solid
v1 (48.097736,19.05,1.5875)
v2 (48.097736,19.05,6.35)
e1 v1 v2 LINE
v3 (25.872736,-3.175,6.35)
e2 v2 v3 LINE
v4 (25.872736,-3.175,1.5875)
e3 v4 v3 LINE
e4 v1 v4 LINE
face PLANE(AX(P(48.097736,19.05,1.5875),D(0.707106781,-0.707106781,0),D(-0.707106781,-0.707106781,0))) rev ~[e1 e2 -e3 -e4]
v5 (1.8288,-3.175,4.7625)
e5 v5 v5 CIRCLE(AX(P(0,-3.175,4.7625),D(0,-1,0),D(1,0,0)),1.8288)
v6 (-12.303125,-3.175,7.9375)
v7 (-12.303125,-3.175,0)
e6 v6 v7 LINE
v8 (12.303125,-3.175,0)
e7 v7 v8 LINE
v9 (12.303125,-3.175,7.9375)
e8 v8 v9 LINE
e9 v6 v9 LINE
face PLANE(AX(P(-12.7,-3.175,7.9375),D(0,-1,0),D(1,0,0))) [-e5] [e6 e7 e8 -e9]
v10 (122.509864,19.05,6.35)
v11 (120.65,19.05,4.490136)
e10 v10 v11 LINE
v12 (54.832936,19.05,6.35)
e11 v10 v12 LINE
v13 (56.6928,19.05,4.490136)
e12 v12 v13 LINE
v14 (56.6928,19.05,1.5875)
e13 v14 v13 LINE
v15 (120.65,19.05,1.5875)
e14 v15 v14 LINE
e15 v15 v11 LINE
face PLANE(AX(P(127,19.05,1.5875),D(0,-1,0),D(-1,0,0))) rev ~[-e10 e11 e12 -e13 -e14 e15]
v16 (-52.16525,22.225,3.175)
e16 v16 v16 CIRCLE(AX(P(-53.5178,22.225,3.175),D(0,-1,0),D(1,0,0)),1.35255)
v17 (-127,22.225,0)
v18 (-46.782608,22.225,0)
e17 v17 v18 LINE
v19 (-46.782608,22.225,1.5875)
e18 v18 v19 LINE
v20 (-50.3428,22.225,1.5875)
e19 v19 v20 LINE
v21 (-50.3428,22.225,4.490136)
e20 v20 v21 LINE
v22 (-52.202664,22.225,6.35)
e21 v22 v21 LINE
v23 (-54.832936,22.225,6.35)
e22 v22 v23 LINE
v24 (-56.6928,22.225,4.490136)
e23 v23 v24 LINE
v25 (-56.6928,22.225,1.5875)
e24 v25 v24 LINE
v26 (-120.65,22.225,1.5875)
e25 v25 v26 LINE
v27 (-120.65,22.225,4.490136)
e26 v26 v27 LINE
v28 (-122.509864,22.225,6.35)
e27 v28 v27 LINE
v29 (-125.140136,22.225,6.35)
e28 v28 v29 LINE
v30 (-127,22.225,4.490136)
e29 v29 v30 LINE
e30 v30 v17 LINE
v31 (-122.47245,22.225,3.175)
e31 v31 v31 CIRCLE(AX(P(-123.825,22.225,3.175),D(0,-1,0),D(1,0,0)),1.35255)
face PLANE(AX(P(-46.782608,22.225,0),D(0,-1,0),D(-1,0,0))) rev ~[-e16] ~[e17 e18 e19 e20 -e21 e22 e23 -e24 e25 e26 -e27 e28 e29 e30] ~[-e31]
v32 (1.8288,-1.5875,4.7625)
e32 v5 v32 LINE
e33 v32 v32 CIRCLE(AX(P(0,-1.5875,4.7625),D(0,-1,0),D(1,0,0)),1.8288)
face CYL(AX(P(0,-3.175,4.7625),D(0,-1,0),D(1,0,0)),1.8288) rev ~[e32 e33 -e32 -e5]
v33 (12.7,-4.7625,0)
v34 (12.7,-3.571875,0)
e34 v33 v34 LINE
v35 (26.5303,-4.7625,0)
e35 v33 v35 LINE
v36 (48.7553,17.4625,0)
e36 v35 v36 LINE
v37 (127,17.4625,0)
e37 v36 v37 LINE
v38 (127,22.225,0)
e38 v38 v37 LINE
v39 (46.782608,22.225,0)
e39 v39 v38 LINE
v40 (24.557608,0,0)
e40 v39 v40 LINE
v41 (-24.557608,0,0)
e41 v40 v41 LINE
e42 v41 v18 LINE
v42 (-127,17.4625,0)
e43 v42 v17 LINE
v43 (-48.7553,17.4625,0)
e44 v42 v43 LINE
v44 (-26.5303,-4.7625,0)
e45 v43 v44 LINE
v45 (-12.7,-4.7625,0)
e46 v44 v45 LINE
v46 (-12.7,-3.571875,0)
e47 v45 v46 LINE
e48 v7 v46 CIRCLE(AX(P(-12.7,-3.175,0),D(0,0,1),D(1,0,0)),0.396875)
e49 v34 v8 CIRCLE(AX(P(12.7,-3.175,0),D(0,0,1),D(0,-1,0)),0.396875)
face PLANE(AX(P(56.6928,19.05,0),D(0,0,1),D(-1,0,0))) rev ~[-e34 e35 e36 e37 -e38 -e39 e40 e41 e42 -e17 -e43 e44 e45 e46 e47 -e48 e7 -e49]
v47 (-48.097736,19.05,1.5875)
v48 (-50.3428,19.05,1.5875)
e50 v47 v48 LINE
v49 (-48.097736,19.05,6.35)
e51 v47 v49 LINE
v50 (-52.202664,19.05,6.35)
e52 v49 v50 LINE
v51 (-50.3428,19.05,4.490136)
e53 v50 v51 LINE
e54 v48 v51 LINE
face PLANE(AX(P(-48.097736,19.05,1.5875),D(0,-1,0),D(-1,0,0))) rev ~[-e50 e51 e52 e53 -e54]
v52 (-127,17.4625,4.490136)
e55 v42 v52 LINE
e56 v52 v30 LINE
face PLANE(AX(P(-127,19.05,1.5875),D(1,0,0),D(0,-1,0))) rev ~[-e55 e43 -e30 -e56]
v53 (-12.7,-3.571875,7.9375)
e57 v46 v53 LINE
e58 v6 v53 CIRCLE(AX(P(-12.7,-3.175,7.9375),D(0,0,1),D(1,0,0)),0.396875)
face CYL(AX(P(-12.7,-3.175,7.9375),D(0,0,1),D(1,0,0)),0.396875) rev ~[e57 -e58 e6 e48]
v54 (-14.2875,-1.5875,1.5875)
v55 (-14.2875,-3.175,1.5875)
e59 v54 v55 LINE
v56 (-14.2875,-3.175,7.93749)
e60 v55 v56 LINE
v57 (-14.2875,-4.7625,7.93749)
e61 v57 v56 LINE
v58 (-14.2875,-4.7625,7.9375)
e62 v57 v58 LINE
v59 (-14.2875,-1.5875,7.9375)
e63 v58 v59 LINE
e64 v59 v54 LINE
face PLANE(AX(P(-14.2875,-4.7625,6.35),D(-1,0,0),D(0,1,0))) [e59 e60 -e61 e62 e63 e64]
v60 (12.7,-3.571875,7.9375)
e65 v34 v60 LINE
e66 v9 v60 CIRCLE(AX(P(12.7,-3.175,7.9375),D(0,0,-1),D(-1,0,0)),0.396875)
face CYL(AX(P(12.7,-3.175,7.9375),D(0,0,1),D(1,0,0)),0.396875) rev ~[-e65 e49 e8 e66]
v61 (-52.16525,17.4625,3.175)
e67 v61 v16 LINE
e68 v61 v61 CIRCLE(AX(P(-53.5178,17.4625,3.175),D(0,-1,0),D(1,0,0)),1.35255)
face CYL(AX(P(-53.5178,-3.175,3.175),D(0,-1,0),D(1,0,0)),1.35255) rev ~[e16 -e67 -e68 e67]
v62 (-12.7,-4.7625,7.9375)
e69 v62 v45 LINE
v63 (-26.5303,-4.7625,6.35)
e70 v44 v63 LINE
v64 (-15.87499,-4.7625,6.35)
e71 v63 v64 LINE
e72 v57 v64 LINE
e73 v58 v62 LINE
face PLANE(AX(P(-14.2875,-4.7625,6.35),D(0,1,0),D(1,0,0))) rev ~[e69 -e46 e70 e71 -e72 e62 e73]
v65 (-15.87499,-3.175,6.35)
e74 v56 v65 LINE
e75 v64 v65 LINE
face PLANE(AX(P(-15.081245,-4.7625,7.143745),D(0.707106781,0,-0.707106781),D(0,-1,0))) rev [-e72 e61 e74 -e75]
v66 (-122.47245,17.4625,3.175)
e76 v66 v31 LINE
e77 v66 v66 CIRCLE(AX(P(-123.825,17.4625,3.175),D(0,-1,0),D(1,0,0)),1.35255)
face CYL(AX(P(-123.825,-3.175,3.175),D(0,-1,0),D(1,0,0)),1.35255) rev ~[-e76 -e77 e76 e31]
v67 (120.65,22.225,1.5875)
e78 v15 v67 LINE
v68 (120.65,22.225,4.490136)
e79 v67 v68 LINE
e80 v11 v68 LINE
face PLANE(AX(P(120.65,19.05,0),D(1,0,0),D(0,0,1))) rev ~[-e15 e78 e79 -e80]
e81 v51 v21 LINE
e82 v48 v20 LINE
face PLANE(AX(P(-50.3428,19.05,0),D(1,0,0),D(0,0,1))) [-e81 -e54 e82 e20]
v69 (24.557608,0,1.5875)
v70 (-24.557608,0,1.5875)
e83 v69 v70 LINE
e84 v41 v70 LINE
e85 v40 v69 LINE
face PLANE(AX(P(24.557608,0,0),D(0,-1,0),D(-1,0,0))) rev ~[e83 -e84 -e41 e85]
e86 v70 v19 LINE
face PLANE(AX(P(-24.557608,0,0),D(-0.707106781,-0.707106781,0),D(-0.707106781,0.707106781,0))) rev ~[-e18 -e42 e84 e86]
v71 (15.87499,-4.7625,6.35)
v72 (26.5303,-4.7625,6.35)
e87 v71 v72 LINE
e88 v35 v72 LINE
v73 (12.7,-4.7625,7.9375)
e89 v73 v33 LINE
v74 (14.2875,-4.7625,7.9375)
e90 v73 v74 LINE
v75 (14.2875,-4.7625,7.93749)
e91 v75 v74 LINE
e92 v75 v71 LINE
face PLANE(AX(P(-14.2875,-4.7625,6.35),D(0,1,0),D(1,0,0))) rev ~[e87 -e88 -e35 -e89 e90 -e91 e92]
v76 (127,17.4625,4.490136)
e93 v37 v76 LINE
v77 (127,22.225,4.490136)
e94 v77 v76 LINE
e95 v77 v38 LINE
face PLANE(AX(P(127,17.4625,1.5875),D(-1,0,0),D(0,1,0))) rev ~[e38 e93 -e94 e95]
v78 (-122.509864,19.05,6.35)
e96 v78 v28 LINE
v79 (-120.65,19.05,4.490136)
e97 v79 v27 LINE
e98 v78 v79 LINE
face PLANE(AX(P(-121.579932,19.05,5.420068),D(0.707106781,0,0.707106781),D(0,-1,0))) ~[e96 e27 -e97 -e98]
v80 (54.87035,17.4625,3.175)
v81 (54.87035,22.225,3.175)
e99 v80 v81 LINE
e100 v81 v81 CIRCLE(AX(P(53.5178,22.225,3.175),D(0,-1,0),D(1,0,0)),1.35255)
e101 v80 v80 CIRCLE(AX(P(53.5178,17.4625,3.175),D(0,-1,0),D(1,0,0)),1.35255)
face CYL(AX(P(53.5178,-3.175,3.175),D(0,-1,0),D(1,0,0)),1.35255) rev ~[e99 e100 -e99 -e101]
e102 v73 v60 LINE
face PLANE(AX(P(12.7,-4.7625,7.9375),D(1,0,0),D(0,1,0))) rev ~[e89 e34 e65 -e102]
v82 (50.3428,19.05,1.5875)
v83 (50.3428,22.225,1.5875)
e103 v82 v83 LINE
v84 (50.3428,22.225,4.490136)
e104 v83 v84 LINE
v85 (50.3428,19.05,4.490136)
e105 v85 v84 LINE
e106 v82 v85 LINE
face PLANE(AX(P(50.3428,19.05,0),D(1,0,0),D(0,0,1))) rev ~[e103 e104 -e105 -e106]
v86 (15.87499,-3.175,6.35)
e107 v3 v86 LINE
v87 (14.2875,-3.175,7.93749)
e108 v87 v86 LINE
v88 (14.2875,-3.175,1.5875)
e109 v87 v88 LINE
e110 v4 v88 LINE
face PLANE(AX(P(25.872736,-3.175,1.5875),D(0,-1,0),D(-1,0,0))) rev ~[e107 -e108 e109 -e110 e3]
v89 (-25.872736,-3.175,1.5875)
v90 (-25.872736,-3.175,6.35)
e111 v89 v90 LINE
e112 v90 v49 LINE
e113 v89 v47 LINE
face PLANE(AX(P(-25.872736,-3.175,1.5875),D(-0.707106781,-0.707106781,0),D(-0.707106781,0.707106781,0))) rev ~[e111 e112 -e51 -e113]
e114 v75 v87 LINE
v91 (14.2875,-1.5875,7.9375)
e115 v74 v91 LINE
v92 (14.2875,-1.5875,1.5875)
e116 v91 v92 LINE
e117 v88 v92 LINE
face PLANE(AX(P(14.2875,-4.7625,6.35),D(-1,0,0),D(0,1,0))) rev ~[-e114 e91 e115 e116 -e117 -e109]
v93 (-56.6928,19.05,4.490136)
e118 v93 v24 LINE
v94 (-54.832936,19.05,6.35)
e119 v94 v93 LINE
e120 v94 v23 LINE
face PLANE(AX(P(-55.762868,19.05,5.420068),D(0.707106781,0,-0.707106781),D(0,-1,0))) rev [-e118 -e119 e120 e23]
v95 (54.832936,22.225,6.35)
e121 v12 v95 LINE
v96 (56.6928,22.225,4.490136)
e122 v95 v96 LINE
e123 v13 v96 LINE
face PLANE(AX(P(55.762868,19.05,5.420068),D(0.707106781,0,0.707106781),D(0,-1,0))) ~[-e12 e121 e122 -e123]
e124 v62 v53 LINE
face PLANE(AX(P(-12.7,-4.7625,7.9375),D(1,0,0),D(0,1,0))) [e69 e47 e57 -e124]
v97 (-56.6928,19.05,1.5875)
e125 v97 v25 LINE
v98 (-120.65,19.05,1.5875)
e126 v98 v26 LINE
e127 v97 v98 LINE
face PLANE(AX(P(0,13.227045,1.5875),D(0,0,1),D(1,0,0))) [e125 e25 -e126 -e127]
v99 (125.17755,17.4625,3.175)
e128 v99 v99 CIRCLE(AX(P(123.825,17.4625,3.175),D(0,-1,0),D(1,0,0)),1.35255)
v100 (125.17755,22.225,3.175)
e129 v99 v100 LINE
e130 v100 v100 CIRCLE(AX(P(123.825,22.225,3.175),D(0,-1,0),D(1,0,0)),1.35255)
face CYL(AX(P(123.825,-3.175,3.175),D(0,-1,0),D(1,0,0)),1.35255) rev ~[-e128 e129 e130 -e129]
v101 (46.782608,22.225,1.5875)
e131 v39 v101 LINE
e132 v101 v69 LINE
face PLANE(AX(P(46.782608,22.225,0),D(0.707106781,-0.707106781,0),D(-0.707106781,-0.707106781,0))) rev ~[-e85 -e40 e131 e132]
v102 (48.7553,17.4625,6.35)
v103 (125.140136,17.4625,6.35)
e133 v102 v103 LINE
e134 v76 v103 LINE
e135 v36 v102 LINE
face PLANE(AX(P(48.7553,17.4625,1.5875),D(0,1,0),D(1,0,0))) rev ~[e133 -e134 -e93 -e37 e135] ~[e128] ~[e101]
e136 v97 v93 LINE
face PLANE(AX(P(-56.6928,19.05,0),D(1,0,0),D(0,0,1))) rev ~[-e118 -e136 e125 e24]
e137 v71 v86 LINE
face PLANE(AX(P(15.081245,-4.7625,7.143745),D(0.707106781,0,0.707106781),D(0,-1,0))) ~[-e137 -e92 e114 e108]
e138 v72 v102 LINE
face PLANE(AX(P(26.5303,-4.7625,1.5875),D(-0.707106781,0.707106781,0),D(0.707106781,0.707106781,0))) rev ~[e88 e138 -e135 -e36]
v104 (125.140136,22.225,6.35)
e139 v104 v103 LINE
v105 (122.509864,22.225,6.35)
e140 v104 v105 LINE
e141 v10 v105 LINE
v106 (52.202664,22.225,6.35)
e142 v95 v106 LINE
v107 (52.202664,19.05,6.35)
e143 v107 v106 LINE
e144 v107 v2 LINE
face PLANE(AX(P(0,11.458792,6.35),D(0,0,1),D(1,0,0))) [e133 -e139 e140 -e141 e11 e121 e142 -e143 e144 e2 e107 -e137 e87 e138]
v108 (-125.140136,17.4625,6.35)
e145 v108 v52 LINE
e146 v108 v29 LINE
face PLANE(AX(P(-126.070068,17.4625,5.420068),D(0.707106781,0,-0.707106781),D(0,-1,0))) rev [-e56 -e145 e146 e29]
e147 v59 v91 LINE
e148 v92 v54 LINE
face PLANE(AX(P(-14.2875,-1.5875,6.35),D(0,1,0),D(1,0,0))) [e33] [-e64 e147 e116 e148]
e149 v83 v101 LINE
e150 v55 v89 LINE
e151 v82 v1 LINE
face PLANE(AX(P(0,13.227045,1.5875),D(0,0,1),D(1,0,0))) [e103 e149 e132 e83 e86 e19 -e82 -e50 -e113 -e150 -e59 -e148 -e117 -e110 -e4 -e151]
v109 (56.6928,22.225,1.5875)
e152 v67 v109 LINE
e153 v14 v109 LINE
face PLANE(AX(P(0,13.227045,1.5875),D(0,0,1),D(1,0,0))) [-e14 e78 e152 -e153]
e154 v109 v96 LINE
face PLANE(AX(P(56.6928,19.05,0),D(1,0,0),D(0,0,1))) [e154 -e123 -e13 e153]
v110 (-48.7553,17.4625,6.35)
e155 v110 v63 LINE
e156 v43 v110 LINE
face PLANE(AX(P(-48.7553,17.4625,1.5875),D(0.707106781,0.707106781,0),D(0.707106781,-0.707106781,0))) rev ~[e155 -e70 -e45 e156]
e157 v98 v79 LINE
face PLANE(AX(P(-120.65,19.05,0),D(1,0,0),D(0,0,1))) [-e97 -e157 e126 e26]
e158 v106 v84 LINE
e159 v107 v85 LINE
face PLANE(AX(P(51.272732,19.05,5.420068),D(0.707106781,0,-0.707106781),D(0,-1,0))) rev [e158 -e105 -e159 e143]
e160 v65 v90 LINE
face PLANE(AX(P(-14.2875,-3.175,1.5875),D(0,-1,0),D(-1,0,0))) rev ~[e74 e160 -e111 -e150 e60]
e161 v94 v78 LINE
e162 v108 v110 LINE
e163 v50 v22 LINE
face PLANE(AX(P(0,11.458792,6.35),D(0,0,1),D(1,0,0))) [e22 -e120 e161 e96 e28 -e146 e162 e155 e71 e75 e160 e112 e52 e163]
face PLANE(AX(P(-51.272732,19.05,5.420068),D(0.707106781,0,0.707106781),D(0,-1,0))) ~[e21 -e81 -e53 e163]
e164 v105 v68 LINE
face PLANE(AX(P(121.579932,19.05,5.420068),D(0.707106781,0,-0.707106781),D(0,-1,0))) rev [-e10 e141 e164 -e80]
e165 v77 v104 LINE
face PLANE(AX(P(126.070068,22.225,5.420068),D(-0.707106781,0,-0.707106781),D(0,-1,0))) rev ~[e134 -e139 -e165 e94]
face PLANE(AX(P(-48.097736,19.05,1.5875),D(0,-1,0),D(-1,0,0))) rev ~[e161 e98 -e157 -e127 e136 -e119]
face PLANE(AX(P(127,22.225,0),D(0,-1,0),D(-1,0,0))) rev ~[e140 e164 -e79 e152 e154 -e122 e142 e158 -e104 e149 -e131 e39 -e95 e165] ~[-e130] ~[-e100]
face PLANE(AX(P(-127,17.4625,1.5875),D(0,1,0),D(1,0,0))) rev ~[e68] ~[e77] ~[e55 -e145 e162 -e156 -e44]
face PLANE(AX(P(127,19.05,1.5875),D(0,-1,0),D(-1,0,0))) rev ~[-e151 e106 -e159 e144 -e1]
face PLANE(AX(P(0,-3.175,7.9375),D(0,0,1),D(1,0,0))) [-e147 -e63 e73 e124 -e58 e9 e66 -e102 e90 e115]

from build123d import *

# Parameters (mm, degrees)
F1_DEPTH  = 1.5875
F3_DEPTH  = 4.7625
F4_W      = 6.35
F4_H      = 6.35
F5_DEPTH  = 3.175
F6_SIZE   = 1.8598642
F7_W      = 28.575
F7_H      = 3.175
F8_DEPTH  = 1.5875
F9_W      = 25.4
F9_H      = 1.5875
F10_DEPTH = 7.9375
F11_R     = 1.35255
F11_R_2   = 1.8288
F12_DEPTH = 25.4
F13_SIZE  = 1.58749
F14_R     = 0.396875
F15_DEPTH = 7.9375


# Not quite as in the source:
# - a fillet or chamfer is up to 0.001 mm smaller than in the source, because OpenCascade refuses the exact size


with BuildPart() as f1:
    # F0 (on Top) → F1 (new body)
    with BuildSketch(Plane.XY):
        Polygon((-46.7826079092, 22.225), (-127, 22.225), (-127, 17.4625), (-48.7553, 17.4625), (-26.5303, -4.7625), (26.5303, -4.7625), (48.7553, 17.4625), (127, 17.4625), (127, 22.225), (46.7826079092, 22.225), (24.5576079092, 0), (-24.5576079092, 0), align=None)
    extrude(amount=F1_DEPTH)

    # F2 (on face) → F3 (join)
    with BuildSketch(Plane.XY.offset(1.5875)):
        Polygon((-127, 19.05), (-127, 17.4625), (-48.7553, 17.4625), (-26.5303, -4.7625), (26.5303, -4.7625), (48.7553, 17.4625), (127, 17.4625), (127, 19.05), (48.0977359697, 19.05), (25.8727359697, -3.175), (14.2875, -3.175), (14.2875, -1.5875), (-14.2875, -1.5875), (-14.2875, -3.175), (-25.8727359697, -3.175), (-48.0977359697, 19.05), align=None)
    extrude(amount=F3_DEPTH)

    # F4 (on face) → F5 (join, through all)
    with BuildSketch(Plane(origin=(0, 19.05, 0), x_dir=(-1, 0, 0), z_dir=(0, 1, 0))):
        with Locations((-53.5178, 3.175)):
            Rectangle(F4_W, F4_H)
        with Locations((-123.825, 3.175)):
            Rectangle(F4_W, F4_H)
        with Locations((123.825, 3.175)):
            Rectangle(F4_W, F4_H)
        with Locations((53.5178, 3.175)):
            Rectangle(F4_W, F4_H)
    extrude(amount=F5_DEPTH)

    # F6
    f6_edges = [f1.edges().sort_by_distance(p)[0] for p in [
        (-127, 19.84375, 6.35),
        (-120.65, 20.6375, 6.35),
        (-56.6928, 20.6375, 6.35),
        (-50.3428, 20.6375, 6.35),
        (50.3428, 20.6375, 6.35),
        (56.6928, 20.6375, 6.35),
        (120.65, 20.6375, 6.35),
        (127, 19.84375, 6.35),
    ]]
    chamfer(f6_edges, length=F6_SIZE)

    # F7 (on face) → F8 (join)
    with BuildSketch(Plane.XY.offset(6.35)):
        with Locations((0, -3.175)):
            Rectangle(F7_W, F7_H)
    extrude(amount=F8_DEPTH)

    # F9 (on face) → F10 (cut, through all)
    with BuildSketch(Plane.XY.offset(7.9375)):
        with Locations((0, -3.96875)):
            Rectangle(F9_W, F9_H)
    extrude(amount=-F10_DEPTH, mode=Mode.SUBTRACT)

    # F11 (on face) → F12 (cut, through all)
    with BuildSketch(Plane.XZ.offset(3.175)):
        with Locations((53.5178, 3.175)):
            Circle(F11_R)
        with Locations((123.825, 3.175)):
            Circle(F11_R)
        with Locations((-123.825, 3.175)):
            Circle(F11_R)
        with Locations((-53.5178, 3.175)):
            Circle(F11_R)
        with Locations((0, 4.7625)):
            Circle(F11_R_2)
    extrude(amount=-F12_DEPTH, mode=Mode.SUBTRACT)

    # F13 (size 1.5875 in the source; OpenCascade refuses exactly that, so slightly less here)
    f13_edges = [f1.edges().sort_by_distance(p)[0] for p in [
        (-14.2875, -3.96875, 6.35),
        (14.2875, -3.96875, 6.35),
    ]]
    chamfer(f13_edges, length=F13_SIZE)

    # F14 (on face) → F15 (cut, through all)
    with BuildSketch(Plane.XY.offset(7.9375)):
        with Locations((-12.7, -3.175)):
            Circle(F14_R)
        with Locations((12.7, -3.175)):
            Circle(F14_R)
    extrude(amount=-F15_DEPTH, mode=Mode.SUBTRACT)


solid = f1.part
